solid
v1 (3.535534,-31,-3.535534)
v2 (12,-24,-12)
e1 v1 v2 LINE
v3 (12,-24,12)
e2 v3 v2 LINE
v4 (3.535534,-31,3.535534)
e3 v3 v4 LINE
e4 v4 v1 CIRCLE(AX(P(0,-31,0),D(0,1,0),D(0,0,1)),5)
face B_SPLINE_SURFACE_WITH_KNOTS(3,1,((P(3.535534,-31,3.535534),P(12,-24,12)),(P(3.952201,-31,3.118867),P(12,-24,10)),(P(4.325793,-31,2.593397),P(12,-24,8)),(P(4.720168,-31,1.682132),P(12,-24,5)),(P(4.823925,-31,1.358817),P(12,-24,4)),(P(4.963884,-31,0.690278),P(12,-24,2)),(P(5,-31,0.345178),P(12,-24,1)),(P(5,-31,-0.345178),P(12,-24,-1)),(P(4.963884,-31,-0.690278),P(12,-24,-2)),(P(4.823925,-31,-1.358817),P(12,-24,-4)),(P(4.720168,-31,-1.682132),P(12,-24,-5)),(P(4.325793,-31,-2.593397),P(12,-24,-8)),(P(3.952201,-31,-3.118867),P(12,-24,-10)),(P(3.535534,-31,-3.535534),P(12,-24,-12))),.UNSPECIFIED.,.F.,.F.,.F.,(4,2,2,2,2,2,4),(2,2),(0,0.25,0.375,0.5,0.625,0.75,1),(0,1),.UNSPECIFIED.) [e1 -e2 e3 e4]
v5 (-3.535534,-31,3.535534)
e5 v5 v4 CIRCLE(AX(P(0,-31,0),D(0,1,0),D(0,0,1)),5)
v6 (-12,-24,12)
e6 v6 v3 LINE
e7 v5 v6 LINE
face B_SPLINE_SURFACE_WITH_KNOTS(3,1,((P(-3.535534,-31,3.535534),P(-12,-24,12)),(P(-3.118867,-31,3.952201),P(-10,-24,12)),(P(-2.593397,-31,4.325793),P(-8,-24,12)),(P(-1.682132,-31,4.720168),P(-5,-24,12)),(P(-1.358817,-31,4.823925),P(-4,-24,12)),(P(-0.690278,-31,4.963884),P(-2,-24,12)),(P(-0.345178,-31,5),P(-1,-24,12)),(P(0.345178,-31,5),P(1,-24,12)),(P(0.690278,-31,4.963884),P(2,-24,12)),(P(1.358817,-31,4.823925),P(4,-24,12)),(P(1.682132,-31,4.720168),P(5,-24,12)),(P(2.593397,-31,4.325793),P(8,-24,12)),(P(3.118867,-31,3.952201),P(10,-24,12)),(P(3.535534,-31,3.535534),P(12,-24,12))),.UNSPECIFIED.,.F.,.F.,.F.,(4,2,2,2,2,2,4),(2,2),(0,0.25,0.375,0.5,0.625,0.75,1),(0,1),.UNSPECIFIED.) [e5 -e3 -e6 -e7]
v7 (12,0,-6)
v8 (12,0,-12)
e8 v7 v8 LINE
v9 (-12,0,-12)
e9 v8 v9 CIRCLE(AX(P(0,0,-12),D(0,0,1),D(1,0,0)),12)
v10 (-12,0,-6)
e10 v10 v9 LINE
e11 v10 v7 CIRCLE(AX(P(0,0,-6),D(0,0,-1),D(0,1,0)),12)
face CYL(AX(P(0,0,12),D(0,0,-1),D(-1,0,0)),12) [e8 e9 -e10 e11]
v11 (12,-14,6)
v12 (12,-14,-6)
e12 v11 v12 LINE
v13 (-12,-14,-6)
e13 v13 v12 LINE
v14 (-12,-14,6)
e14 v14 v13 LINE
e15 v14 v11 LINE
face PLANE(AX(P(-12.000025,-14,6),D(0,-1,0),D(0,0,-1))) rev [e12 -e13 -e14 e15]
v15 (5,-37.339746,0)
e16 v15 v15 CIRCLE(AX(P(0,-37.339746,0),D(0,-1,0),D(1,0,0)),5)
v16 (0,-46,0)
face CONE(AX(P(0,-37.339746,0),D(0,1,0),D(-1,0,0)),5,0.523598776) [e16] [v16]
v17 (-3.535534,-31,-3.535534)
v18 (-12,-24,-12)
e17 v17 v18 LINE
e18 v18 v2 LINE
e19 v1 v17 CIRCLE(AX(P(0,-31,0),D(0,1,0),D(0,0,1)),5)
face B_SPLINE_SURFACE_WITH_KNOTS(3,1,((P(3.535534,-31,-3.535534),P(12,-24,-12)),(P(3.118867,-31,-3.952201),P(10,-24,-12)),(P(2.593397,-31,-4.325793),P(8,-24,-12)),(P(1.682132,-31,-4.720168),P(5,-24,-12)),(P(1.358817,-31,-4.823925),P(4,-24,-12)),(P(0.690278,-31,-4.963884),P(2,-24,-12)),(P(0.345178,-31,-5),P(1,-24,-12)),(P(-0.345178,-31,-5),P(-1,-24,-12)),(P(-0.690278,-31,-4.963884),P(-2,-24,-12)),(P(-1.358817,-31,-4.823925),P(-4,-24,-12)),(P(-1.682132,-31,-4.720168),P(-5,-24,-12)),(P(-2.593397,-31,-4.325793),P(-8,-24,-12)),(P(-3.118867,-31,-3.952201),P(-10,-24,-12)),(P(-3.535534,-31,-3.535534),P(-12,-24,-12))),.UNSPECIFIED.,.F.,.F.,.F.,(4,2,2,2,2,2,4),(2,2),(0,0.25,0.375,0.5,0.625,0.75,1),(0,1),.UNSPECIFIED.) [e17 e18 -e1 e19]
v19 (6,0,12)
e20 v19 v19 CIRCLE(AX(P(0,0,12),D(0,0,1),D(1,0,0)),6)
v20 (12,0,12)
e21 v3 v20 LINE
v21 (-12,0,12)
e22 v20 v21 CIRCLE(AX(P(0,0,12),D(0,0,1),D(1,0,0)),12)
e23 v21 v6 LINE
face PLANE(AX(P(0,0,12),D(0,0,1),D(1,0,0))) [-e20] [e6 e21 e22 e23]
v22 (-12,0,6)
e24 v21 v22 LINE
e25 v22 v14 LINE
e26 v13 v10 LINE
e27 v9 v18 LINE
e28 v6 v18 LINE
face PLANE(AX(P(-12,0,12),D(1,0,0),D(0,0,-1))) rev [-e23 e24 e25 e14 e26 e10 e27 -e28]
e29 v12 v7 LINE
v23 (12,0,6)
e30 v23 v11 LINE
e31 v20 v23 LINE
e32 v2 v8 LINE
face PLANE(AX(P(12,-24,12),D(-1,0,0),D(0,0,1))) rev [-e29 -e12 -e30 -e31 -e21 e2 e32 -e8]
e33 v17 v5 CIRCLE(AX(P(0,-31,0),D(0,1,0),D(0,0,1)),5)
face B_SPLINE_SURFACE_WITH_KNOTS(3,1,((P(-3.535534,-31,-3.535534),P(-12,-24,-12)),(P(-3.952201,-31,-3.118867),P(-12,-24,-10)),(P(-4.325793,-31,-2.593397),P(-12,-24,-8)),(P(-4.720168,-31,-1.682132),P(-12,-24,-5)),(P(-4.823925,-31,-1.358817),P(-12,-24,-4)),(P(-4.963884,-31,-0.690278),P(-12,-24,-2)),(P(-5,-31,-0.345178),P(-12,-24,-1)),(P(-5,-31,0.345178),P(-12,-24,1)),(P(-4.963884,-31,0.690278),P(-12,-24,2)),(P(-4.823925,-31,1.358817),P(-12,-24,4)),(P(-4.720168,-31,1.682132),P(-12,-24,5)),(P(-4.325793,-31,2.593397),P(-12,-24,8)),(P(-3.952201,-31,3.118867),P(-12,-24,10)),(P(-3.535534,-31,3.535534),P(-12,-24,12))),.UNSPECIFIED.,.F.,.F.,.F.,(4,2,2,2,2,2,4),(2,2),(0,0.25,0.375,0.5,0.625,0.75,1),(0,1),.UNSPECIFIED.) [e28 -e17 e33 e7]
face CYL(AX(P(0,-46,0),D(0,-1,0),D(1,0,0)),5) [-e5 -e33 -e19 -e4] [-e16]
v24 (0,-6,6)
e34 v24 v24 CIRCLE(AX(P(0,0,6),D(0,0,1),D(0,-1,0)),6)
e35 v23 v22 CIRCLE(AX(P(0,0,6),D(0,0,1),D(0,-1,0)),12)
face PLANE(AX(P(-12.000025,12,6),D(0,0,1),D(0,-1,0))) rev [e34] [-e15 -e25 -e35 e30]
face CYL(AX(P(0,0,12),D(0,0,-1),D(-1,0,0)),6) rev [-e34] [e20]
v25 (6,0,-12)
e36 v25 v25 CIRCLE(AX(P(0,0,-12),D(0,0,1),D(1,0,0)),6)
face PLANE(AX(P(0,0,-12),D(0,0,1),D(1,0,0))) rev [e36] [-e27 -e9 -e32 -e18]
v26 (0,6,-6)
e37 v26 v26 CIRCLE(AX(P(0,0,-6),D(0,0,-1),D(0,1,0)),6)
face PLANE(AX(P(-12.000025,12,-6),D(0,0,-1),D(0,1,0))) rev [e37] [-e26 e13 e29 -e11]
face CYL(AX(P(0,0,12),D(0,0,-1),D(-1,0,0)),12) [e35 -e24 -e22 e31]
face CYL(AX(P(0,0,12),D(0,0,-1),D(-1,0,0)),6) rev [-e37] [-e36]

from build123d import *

# Parameters (mm, degrees)
SKETCH1_R           = 6
BOSS_EXTRUDE1_DEPTH = 12
SKETCH4_W           = 12
SKETCH4_H           = 26
CUT_EXTRUDE1_DEPTH  = 54.25410789


with BuildPart() as part:
    # Sketch1 → Boss-Extrude1 (new, symmetric)
    with BuildSketch(Plane.XY):
        with BuildLine():
            Line((-12, 0), (-12, -24))
            Line((-12, -24), (12, -24))
            Line((12, -24), (12, 0))
            ThreePointArc((12, 0), (0, 12), (-12, 0))
        make_face()
        Circle(SKETCH1_R, mode=Mode.SUBTRACT)
    extrude(amount=BOSS_EXTRUDE1_DEPTH, both=True)

    # Loft1: read off the stored shape, not the designer's step
    # Loft1: loft between two sections, ruled curve by curve
    loft1_from = [
        Edge.make_bspline([(3.535533906, -31, 3.535533906), (3.952200573, -31, 3.118867239), (4.325792981, -31, 2.593397212), (4.720167594, -31, 1.6821315), (4.823924825, -31, 1.358816515), (4.963884467, -31, 0.690278229), (5, -31, 0.345177969), (5, -31, -0.345177969), (4.963884467, -31, -0.690278229), (4.823924825, -31, -1.358816515), (4.720167594, -31, -1.6821315), (4.325792981, -31, -2.593397212), (3.952200573, -31, -3.118867239), (3.535533906, -31, -3.535533906)], [0, 0, 0, 0, 0.25, 0.25, 0.375, 0.375, 0.5, 0.5, 0.625, 0.625, 0.75, 0.75, 1, 1, 1, 1], 3),
        Edge.make_bspline([(3.535533906, -31, -3.535533906), (3.118867239, -31, -3.952200573), (2.593397212, -31, -4.325792981), (1.6821315, -31, -4.720167594), (1.358816515, -31, -4.823924825), (0.690278229, -31, -4.963884467), (0.345177969, -31, -5), (-0.345177969, -31, -5), (-0.690278229, -31, -4.963884467), (-1.358816515, -31, -4.823924825), (-1.6821315, -31, -4.720167594), (-2.593397212, -31, -4.325792981), (-3.118867239, -31, -3.952200573), (-3.535533906, -31, -3.535533906)], [0, 0, 0, 0, 0.25, 0.25, 0.375, 0.375, 0.5, 0.5, 0.625, 0.625, 0.75, 0.75, 1, 1, 1, 1], 3),
        Edge.make_bspline([(-3.535533906, -31, 3.535533906), (-3.118867239, -31, 3.952200573), (-2.593397212, -31, 4.325792981), (-1.6821315, -31, 4.720167594), (-1.358816515, -31, 4.823924825), (-0.690278229, -31, 4.963884467), (-0.345177969, -31, 5), (0.345177969, -31, 5), (0.690278229, -31, 4.963884467), (1.358816515, -31, 4.823924825), (1.6821315, -31, 4.720167594), (2.593397212, -31, 4.325792981), (3.118867239, -31, 3.952200573), (3.535533906, -31, 3.535533906)], [0, 0, 0, 0, 0.25, 0.25, 0.375, 0.375, 0.5, 0.5, 0.625, 0.625, 0.75, 0.75, 1, 1, 1, 1], 3),
        Edge.make_bspline([(-3.535533906, -31, -3.535533906), (-3.952200573, -31, -3.118867239), (-4.325792981, -31, -2.593397212), (-4.720167594, -31, -1.6821315), (-4.823924825, -31, -1.358816515), (-4.963884467, -31, -0.690278229), (-5, -31, -0.345177969), (-5, -31, 0.345177969), (-4.963884467, -31, 0.690278229), (-4.823924825, -31, 1.358816515), (-4.720167594, -31, 1.6821315), (-4.325792981, -31, 2.593397212), (-3.952200573, -31, 3.118867239), (-3.535533906, -31, 3.535533906)], [0, 0, 0, 0, 0.25, 0.25, 0.375, 0.375, 0.5, 0.5, 0.625, 0.625, 0.75, 0.75, 1, 1, 1, 1], 3),
    ]
    loft1_to = [
        Edge.make_bspline([(12, -24, 12), (12, -24, 10), (12, -24, 8), (12, -24, 5), (12, -24, 4), (12, -24, 2), (12, -24, 1), (12, -24, -1), (12, -24, -2), (12, -24, -4), (12, -24, -5), (12, -24, -8), (12, -24, -10), (12, -24, -12)], [0, 0, 0, 0, 0.25, 0.25, 0.375, 0.375, 0.5, 0.5, 0.625, 0.625, 0.75, 0.75, 1, 1, 1, 1], 3),
        Edge.make_bspline([(12, -24, -12), (10, -24, -12), (8, -24, -12), (5, -24, -12), (4, -24, -12), (2, -24, -12), (1, -24, -12), (-1, -24, -12), (-2, -24, -12), (-4, -24, -12), (-5, -24, -12), (-8, -24, -12), (-10, -24, -12), (-12, -24, -12)], [0, 0, 0, 0, 0.25, 0.25, 0.375, 0.375, 0.5, 0.5, 0.625, 0.625, 0.75, 0.75, 1, 1, 1, 1], 3),
        Edge.make_bspline([(-12, -24, 12), (-10, -24, 12), (-8, -24, 12), (-5, -24, 12), (-4, -24, 12), (-2, -24, 12), (-1, -24, 12), (1, -24, 12), (2, -24, 12), (4, -24, 12), (5, -24, 12), (8, -24, 12), (10, -24, 12), (12, -24, 12)], [0, 0, 0, 0, 0.25, 0.25, 0.375, 0.375, 0.5, 0.5, 0.625, 0.625, 0.75, 0.75, 1, 1, 1, 1], 3),
        Edge.make_bspline([(-12, -24, -12), (-12, -24, -10), (-12, -24, -8), (-12, -24, -5), (-12, -24, -4), (-12, -24, -2), (-12, -24, -1), (-12, -24, 1), (-12, -24, 2), (-12, -24, 4), (-12, -24, 5), (-12, -24, 8), (-12, -24, 10), (-12, -24, 12)], [0, 0, 0, 0, 0.25, 0.25, 0.375, 0.375, 0.5, 0.5, 0.625, 0.625, 0.75, 0.75, 1, 1, 1, 1], 3),
    ]
    loft1 = Solid(Shell([*[Face.make_surface_from_curves(loft1_from[k], loft1_to[k]) for k in range(4)], Face(Wire(loft1_from)), Face(Wire(loft1_to))]))
    add(loft1)

    # Sketch3 → Revolve1 (revolve)
    with BuildSketch(Plane.XY, mode=Mode.PRIVATE) as revolve1_sk:
        Polygon((-5, -31), (-5, -37.339745962), (0, -46), (0, -31), align=None)
    revolve(revolve1_sk.sketch.rotate(Axis((0, -46, 0), (0, 1, 0)), 180), axis=Axis((0, -46, 0), (0, 1, 0)))

    # Sketch4 → Cut-Extrude1 (cut, through all)
    with BuildSketch(Plane(origin=(12, 0, 0), x_dir=(0, 0, -1), z_dir=(1, 0, 0))):
        with Locations((0, -1)):
            Rectangle(SKETCH4_W, SKETCH4_H)
    extrude(amount=-CUT_EXTRUDE1_DEPTH, mode=Mode.SUBTRACT)


solid = part.part
